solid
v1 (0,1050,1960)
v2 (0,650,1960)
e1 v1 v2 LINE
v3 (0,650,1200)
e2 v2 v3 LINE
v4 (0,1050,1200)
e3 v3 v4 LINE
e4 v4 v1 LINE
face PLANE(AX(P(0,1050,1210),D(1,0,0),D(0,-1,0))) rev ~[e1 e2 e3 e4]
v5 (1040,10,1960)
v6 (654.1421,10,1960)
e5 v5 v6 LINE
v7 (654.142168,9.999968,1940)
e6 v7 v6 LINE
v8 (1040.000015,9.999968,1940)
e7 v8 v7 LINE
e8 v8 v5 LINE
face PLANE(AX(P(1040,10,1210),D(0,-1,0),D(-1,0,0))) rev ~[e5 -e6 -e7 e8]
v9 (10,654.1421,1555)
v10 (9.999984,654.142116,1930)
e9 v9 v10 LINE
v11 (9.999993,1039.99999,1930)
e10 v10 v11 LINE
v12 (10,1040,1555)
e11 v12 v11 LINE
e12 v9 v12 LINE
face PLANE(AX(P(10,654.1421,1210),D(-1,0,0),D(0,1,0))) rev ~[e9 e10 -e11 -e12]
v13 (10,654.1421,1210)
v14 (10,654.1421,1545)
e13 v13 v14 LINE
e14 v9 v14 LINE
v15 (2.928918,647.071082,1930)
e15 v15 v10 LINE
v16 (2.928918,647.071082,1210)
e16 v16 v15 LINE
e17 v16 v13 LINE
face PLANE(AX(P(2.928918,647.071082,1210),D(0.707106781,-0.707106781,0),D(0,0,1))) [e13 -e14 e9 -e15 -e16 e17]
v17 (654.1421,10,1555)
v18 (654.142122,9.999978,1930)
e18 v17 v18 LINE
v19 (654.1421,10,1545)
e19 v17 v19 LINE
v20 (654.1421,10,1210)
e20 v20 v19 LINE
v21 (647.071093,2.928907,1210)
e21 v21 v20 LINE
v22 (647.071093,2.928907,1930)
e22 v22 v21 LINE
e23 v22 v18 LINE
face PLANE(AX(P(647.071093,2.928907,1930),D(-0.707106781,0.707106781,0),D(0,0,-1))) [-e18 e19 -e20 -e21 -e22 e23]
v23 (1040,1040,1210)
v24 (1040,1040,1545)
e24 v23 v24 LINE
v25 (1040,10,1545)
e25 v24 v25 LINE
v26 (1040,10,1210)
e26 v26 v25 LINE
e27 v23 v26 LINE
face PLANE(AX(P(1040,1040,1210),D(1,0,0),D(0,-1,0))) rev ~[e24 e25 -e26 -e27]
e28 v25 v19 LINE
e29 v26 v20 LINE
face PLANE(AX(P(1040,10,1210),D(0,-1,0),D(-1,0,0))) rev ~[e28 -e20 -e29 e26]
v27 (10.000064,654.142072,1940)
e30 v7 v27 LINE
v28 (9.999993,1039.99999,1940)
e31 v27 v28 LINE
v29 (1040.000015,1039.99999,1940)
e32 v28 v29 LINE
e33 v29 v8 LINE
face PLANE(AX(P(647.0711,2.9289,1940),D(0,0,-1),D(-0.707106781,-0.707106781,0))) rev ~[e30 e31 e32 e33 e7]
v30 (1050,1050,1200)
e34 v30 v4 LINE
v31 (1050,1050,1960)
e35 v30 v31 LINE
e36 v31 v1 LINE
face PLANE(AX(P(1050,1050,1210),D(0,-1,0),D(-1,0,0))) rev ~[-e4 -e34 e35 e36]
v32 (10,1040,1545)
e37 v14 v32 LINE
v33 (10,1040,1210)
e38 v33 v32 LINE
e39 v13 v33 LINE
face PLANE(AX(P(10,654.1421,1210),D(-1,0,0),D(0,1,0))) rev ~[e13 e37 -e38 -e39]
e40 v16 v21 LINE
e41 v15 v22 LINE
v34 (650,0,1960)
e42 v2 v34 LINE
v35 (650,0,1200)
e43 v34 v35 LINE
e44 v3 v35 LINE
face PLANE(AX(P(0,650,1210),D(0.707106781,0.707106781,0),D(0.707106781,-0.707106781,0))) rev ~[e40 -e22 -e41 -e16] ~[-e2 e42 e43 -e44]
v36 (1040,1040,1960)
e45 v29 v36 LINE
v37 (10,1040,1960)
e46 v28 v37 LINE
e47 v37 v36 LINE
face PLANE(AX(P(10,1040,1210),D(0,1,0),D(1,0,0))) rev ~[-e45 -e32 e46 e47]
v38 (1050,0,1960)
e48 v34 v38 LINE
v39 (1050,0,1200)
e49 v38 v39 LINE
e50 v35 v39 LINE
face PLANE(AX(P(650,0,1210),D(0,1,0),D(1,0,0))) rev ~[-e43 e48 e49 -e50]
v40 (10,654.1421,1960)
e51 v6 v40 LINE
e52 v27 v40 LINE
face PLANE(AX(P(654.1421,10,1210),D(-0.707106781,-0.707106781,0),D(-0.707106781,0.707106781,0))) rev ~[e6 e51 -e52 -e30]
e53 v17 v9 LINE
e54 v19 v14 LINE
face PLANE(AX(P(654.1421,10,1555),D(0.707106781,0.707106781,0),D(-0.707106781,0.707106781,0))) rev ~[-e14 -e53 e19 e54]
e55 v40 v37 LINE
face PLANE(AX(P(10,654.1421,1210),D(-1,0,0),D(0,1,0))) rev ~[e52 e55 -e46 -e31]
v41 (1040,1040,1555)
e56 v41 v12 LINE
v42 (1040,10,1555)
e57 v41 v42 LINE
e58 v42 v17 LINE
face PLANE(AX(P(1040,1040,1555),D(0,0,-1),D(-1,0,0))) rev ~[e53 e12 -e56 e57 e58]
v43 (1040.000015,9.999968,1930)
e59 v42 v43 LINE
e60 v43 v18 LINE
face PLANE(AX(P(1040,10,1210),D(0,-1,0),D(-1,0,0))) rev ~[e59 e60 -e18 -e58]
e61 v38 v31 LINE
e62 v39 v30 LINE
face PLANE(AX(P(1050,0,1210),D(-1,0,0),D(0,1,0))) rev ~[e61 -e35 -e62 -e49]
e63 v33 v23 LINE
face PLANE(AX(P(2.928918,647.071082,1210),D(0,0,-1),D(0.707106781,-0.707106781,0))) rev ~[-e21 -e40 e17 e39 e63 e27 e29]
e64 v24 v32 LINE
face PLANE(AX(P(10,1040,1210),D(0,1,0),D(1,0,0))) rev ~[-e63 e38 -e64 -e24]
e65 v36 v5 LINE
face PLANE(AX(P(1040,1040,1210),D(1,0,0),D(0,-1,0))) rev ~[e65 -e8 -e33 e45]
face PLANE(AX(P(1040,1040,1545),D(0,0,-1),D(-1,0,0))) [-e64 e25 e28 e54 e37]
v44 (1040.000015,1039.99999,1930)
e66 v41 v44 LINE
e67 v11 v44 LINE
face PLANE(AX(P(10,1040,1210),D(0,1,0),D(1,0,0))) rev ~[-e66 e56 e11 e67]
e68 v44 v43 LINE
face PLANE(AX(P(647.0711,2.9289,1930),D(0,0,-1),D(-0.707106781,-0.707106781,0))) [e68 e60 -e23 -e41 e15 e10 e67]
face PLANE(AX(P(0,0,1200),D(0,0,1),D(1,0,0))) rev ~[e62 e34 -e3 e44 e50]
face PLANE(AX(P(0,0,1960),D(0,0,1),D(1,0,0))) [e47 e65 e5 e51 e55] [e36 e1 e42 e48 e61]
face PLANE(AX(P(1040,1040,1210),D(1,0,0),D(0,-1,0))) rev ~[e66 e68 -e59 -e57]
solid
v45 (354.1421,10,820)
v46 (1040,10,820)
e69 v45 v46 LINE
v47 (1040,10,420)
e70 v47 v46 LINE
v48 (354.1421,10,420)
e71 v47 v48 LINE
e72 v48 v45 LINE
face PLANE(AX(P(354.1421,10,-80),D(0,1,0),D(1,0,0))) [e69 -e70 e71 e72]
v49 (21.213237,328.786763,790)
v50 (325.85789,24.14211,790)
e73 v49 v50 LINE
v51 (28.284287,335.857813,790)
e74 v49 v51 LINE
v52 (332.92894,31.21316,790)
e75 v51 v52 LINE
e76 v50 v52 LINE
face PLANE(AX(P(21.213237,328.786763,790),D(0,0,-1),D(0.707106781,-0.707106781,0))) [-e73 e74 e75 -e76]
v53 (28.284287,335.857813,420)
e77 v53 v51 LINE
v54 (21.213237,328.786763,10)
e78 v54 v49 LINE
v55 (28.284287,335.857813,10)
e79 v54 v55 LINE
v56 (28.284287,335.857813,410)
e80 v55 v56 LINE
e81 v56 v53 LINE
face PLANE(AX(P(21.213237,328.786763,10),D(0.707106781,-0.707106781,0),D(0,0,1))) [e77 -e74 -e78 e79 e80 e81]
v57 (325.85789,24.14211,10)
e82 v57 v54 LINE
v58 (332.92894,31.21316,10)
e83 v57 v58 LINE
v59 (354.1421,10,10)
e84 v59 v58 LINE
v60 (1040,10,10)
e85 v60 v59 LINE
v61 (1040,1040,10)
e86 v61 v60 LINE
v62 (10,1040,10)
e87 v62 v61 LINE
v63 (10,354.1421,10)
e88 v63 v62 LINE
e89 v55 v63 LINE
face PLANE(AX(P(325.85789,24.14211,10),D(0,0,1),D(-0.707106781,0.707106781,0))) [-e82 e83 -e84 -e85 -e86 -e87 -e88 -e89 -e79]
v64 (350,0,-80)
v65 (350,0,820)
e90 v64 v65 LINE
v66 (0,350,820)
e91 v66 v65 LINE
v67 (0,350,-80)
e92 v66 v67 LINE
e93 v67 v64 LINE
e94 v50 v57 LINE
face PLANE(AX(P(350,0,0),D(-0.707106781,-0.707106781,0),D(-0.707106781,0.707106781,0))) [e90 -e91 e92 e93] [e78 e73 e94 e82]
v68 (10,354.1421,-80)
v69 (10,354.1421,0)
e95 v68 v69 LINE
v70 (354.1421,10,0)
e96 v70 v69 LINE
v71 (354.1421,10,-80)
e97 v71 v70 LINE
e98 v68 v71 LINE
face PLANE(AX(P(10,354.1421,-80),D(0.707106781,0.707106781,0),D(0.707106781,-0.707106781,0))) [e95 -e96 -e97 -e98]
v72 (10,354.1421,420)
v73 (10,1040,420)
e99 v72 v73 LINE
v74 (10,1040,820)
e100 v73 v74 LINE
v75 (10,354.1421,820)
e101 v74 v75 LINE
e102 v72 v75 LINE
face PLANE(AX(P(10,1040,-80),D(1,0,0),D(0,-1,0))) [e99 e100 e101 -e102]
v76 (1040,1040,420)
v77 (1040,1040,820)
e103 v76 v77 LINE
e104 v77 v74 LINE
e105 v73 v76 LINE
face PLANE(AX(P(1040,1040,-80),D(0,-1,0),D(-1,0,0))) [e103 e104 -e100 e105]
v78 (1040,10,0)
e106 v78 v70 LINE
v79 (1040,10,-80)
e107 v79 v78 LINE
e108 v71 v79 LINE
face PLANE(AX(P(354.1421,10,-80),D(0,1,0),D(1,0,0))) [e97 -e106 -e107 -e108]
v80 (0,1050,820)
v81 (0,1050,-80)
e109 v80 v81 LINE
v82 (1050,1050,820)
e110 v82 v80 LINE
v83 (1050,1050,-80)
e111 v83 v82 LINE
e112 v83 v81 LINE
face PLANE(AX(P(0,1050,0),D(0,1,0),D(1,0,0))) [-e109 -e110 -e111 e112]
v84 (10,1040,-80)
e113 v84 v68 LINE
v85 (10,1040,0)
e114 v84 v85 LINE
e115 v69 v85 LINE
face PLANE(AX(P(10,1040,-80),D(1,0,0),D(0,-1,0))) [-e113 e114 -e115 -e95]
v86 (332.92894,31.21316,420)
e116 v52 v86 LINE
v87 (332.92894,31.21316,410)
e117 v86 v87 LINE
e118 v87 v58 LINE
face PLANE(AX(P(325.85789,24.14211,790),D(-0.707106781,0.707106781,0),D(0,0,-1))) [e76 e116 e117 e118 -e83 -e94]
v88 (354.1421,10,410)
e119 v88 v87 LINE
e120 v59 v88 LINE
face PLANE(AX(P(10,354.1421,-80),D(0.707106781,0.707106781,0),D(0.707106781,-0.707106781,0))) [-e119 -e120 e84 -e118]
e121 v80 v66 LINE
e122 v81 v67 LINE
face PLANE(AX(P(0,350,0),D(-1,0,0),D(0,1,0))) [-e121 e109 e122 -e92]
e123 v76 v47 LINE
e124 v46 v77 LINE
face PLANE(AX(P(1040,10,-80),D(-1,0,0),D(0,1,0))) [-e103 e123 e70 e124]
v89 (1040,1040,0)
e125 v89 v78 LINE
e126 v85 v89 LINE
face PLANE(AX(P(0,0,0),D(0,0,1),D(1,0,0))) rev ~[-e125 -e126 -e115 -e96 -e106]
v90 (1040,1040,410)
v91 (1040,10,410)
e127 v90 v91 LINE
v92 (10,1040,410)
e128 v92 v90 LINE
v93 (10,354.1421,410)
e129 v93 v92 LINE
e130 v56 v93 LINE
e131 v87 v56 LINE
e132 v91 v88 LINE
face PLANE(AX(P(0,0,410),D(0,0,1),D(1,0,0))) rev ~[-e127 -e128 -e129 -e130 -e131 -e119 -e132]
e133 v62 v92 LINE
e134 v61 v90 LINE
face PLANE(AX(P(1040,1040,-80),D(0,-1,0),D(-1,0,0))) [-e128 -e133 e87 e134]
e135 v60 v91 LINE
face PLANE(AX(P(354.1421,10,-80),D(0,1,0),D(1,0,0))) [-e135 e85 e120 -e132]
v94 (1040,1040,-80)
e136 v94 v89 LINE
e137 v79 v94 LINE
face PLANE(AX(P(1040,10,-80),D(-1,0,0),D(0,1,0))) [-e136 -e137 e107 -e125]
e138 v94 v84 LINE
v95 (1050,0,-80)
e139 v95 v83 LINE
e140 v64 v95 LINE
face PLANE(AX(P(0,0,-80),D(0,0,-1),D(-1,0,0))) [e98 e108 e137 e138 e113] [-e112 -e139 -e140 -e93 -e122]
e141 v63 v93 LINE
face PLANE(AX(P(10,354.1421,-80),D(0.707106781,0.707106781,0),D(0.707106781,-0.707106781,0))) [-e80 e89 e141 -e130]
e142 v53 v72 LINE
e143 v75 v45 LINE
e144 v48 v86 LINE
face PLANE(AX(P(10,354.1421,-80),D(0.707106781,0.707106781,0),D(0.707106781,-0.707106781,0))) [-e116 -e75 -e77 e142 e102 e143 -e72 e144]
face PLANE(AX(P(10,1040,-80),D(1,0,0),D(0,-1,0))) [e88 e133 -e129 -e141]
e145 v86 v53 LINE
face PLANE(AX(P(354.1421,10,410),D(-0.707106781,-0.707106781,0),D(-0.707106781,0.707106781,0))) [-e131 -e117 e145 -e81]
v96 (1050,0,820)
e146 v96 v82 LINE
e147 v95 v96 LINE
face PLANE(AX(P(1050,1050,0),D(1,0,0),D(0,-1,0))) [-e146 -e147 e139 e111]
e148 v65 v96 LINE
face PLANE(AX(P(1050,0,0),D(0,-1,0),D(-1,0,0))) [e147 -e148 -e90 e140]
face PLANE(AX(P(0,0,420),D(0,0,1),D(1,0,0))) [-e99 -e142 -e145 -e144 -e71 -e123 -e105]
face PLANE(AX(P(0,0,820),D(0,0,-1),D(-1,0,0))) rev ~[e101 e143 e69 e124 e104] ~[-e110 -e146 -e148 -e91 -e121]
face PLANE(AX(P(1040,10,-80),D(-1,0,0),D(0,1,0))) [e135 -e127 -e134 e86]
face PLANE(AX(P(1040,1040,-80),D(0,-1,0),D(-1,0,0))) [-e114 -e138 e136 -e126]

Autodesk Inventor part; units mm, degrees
sketch "Sketch2" plane through (0, 0, 0) normal (0, 0, 1) x (1, 0, 0)
  line L0 (0, 0) -> (1050, 0) construction
  line L1 (1050, 0) -> (1050, 1050) construction
  line L2 (1050, 1050) -> (0, 1050) construction
  line L3 (0, 1050) -> (0, 0) construction
  line L4 (350, 0) -> (0, 350)
  line L5 (0, 350) -> (0, 1050)
  line L6 (0, 1050) -> (1050, 1050)
  line L7 (1050, 1050) -> (1050, 0)
  line L8 (1050, 0) -> (350, 0)
  dimension "d6" = 45
  dimension "profundidad" = 700
  dimension "d8" = 350
extrude "Extrusion1" add sketch "Sketch2" along normal blind 10
ref_plane "Work Plane1" through (0, 0, -80) normal (0, 0, -1) x (-1, 0, 0)
sketch "Sketch4" plane through (0, 0, -80) normal (0, 0, -1) x (-1, 0, 0)
  line L0 (-1050, 1050) -> (0, 1050) projected
  line L1 (-1050, 0) -> (-1050, 1050) projected
  line L2 (-350, 0) -> (-1050, 0) projected
  line L3 (0, 350) -> (-350, 0) projected
  line L4 (0, 1050) -> (0, 350) projected
  line L5 (-1040, 1040) -> (-10, 1040)
  line L6 (-10, 1040) -> (-10, 354.1421)
  line L7 (-10, 354.1421) -> (-354.1421, 10)
  line L8 (-354.1421, 10) -> (-1040, 10)
  line L9 (-1040, 10) -> (-1040, 1040)
  point P0 (0, 0)
  dimension "d12" = 10
extrude "Extrusion2" add sketch "Sketch4" against normal blind 900
sketch "Sketch5" plane through (350, 0, 820) normal (-0.7071068, -0.7071068, 0) x (-0.7071068, 0.7071068, 0)
  line L0 (0, 900) -> (0, 0) construction
  line L1 (494.9747, 900) -> (494.9747, 0) construction
  line L2 (494.9747, 0) -> (0, 0) construction
  line L3 (490.8326, 810) -> (4.1421, 810) construction
  line L4 (464.9747, 30) -> (34.1421, 30)
  line L5 (34.1421, 30) -> (34.1421, 810)
  line L6 (34.1421, 810) -> (464.9747, 810)
  line L7 (464.9747, 810) -> (464.9747, 30)
  line L8 (4.1421, 810) -> (4.1421, 0) projected
  point P0 (247.4874, 820)
  dimension "d15" = 30
  dimension "d16" = 30
  dimension "d17" = 30
  dimension "d18" = 0
extrude "Extrusion3" cut sketch "Sketch5" against normal up to next
ref_plane "Work Plane2" through (0, 0, 1200) normal (0, 0, 1) x (1, 0, 0)
sketch "Sketch12" plane through (0, 0, 1200) normal (0, 0, 1) x (1, 0, 0)
  line L0 (1050, 1050) -> (0, 1050) projected
  line L1 (0, 1050) -> (0, 350) construction
  line L2 (0, 350) -> (350, 0) construction
  line L3 (350, 0) -> (1050, 0) construction
  line L4 (1050, 0) -> (1050, 1050) projected
  line L5 (0, 650) -> (650, 0)
  line L6 (0, 650) -> (0, 1050)
  line L7 (650, 0) -> (1050, 0)
  point P0 (0, 0)
  dimension "d32" = 400
extrude "Extrusion8" add sketch "Sketch12" along normal blind 10
sketch "Sketch13" plane through (0, 0, 1210) normal (0, 0, 1) x (1, 0, 0)
  line L0 (1050, 1050) -> (0, 1050) projected
  line L1 (0, 1050) -> (0, 650) projected
  line L2 (0, 650) -> (650, 0) projected
  line L3 (650, 0) -> (1050, 0) projected
  line L4 (1050, 0) -> (1050, 1050) projected
  line L5 (10, 1040) -> (1040, 1040)
  line L6 (1040, 1040) -> (1040, 10)
  line L7 (1040, 10) -> (654.1421, 10)
  line L8 (654.1421, 10) -> (10, 654.1421)
  line L9 (10, 654.1421) -> (10, 1040)
  point P0 (0, 0)
  dimension "d35" = 10
extrude "Extrusion9" add sketch "Sketch13" along normal blind 750
sketch "Sketch14" plane through (650, 0, 1960) normal (-0.7071068, -0.7071068, 0) x (-0.7071068, 0.7071068, 0)
  line L0 (915.0967, 750) -> (4.1421, 750) projected
  line L1 (915.0967, 750) -> (915.0967, 0) construction
  line L2 (4.1421, 750) -> (4.1421, 0) construction
  line L3 (915.0967, 30) -> (4.1421, 30)
  line L4 (915.0967, 750) -> (915.0967, 30)
  line L5 (4.1421, 30) -> (4.1421, 750)
  point P0 (459.6194, 1960)
  dimension "d38" = 30
extrude "Extrusion10" cut sketch "Sketch14" against normal up to next
sketch "Sketch15" plane through (647.0711, 2.9289, 1930) normal (0, 0, -1) x (-0.7071068, -0.7071068, 0)
  line L0 (-10, 0) -> (-10, 910.9545) projected
  line L1 (-282.8427, -272.8427) -> (-10, 0) projected
  line L2 (-1011.1627, 455.4773) -> (-282.8427, -272.8427) projected
  line L3 (-282.8427, 1183.7973) -> (-1011.1627, 455.4773) projected
  line L4 (-10, 910.9545) -> (-282.8427, 1183.7973) projected
  point P0 (459.6194, 455.4773)
  point P1 (0, 10)
  point P2 (0, 900.9545)
extrude "Extrusion11" add sketch "Sketch15" against normal blind 10
ref_plane "Work Plane3" through (1040, 1040, 1555) normal (0, 0, -1) x (-1, 0, 0)
ref_plane "Work Plane4" through (0, 0, 410) normal (0, 0, 1) x (1, 0, 0)
sketch "Sketch16" plane through (1040, 1040, 1555) normal (0, 0, -1) x (-1, 0, 0)
  line L0 (385.8579, -1030) -> (1030, -385.8579) construction
  line L1 (1030, 0) -> (1030, -685.8579) construction
  line L2 (0, 0) -> (1030, 0) construction
  line L3 (0, -1030) -> (0, 0) construction
  line L4 (685.8579, -1030) -> (0, -1030) construction
  line L5 (0, 0) -> (0, -1030) construction
  line L6 (0, -1030) -> (685.8579, -1030) construction
  line L7 (685.8579, -1030) -> (1030, -685.8579) construction
  line L8 (1030, -685.8579) -> (1030, 0) construction
  line L9 (1030, 0) -> (0, 0) construction
  line L10 (385.8579, -1030) -> (1030, -385.8579) projected
  line L11 (1030, -385.8579) -> (1030, 0) projected
  line L12 (1030, -385.8579) -> (1030, 0)
  line L13 (0, 0) -> (1030, 0) projected
  line L14 (1030, 0) -> (0, 0)
  line L15 (-10, -1040) -> (-10, 10) projected
  line L16 (0, 0) -> (0, -1030) projected
  line L17 (0, 0) -> (0, -1030)
  line L18 (0, -1030) -> (385.8579, -1030)
  point P0 (1040, -1040)
  point P1 (0, 0)
  point P2 (-644.1421, 0)
  point P3 (-1030, 385.8579)
  point P4 (-385.8579, 1030)
  point P5 (0, 644.1421)
extrude "Extrusion12" add sketch "Sketch16" along normal blind 10
sketch "Sketch17" plane through (0, 0, 410) normal (0, 0, 1) x (1, 0, 0)
  line L0 (1040, 1040) -> (1040, 10) projected
  line L1 (1040, 10) -> (354.1421, 10) projected
  line L2 (354.1421, 10) -> (10, 354.1421) projected
  line L3 (10, 354.1421) -> (10, 1040) projected
  line L4 (10, 1040) -> (1040, 1040) projected
  point P0 (0, 0)
extrude "Extrusion13" add sketch "Sketch17" along normal blind 10
equation "\"d8\" = 0.5 * profundidad"
equation "\"d12\" = espesor"
equation "\"d15\" = 3 * espesor"
equation "\"d16\" = 3 * espesor"
equation "\"d17\" = 3 * espesor"
equation "\"d33\" = espesor"
equation "\"d35\" = espesor"
equation "\"d38\" = 3 * espesor"
equation "\"d41\" = espesor"
equation "\"d45\" = espesor"
equation "\"d47\" = espesor"
equation "\"d43\" = 0.5 * h_sup"
equation "\"espesor\" = 10"
equation "\"h_sup\" = 750"
properties part number "esquinero"
